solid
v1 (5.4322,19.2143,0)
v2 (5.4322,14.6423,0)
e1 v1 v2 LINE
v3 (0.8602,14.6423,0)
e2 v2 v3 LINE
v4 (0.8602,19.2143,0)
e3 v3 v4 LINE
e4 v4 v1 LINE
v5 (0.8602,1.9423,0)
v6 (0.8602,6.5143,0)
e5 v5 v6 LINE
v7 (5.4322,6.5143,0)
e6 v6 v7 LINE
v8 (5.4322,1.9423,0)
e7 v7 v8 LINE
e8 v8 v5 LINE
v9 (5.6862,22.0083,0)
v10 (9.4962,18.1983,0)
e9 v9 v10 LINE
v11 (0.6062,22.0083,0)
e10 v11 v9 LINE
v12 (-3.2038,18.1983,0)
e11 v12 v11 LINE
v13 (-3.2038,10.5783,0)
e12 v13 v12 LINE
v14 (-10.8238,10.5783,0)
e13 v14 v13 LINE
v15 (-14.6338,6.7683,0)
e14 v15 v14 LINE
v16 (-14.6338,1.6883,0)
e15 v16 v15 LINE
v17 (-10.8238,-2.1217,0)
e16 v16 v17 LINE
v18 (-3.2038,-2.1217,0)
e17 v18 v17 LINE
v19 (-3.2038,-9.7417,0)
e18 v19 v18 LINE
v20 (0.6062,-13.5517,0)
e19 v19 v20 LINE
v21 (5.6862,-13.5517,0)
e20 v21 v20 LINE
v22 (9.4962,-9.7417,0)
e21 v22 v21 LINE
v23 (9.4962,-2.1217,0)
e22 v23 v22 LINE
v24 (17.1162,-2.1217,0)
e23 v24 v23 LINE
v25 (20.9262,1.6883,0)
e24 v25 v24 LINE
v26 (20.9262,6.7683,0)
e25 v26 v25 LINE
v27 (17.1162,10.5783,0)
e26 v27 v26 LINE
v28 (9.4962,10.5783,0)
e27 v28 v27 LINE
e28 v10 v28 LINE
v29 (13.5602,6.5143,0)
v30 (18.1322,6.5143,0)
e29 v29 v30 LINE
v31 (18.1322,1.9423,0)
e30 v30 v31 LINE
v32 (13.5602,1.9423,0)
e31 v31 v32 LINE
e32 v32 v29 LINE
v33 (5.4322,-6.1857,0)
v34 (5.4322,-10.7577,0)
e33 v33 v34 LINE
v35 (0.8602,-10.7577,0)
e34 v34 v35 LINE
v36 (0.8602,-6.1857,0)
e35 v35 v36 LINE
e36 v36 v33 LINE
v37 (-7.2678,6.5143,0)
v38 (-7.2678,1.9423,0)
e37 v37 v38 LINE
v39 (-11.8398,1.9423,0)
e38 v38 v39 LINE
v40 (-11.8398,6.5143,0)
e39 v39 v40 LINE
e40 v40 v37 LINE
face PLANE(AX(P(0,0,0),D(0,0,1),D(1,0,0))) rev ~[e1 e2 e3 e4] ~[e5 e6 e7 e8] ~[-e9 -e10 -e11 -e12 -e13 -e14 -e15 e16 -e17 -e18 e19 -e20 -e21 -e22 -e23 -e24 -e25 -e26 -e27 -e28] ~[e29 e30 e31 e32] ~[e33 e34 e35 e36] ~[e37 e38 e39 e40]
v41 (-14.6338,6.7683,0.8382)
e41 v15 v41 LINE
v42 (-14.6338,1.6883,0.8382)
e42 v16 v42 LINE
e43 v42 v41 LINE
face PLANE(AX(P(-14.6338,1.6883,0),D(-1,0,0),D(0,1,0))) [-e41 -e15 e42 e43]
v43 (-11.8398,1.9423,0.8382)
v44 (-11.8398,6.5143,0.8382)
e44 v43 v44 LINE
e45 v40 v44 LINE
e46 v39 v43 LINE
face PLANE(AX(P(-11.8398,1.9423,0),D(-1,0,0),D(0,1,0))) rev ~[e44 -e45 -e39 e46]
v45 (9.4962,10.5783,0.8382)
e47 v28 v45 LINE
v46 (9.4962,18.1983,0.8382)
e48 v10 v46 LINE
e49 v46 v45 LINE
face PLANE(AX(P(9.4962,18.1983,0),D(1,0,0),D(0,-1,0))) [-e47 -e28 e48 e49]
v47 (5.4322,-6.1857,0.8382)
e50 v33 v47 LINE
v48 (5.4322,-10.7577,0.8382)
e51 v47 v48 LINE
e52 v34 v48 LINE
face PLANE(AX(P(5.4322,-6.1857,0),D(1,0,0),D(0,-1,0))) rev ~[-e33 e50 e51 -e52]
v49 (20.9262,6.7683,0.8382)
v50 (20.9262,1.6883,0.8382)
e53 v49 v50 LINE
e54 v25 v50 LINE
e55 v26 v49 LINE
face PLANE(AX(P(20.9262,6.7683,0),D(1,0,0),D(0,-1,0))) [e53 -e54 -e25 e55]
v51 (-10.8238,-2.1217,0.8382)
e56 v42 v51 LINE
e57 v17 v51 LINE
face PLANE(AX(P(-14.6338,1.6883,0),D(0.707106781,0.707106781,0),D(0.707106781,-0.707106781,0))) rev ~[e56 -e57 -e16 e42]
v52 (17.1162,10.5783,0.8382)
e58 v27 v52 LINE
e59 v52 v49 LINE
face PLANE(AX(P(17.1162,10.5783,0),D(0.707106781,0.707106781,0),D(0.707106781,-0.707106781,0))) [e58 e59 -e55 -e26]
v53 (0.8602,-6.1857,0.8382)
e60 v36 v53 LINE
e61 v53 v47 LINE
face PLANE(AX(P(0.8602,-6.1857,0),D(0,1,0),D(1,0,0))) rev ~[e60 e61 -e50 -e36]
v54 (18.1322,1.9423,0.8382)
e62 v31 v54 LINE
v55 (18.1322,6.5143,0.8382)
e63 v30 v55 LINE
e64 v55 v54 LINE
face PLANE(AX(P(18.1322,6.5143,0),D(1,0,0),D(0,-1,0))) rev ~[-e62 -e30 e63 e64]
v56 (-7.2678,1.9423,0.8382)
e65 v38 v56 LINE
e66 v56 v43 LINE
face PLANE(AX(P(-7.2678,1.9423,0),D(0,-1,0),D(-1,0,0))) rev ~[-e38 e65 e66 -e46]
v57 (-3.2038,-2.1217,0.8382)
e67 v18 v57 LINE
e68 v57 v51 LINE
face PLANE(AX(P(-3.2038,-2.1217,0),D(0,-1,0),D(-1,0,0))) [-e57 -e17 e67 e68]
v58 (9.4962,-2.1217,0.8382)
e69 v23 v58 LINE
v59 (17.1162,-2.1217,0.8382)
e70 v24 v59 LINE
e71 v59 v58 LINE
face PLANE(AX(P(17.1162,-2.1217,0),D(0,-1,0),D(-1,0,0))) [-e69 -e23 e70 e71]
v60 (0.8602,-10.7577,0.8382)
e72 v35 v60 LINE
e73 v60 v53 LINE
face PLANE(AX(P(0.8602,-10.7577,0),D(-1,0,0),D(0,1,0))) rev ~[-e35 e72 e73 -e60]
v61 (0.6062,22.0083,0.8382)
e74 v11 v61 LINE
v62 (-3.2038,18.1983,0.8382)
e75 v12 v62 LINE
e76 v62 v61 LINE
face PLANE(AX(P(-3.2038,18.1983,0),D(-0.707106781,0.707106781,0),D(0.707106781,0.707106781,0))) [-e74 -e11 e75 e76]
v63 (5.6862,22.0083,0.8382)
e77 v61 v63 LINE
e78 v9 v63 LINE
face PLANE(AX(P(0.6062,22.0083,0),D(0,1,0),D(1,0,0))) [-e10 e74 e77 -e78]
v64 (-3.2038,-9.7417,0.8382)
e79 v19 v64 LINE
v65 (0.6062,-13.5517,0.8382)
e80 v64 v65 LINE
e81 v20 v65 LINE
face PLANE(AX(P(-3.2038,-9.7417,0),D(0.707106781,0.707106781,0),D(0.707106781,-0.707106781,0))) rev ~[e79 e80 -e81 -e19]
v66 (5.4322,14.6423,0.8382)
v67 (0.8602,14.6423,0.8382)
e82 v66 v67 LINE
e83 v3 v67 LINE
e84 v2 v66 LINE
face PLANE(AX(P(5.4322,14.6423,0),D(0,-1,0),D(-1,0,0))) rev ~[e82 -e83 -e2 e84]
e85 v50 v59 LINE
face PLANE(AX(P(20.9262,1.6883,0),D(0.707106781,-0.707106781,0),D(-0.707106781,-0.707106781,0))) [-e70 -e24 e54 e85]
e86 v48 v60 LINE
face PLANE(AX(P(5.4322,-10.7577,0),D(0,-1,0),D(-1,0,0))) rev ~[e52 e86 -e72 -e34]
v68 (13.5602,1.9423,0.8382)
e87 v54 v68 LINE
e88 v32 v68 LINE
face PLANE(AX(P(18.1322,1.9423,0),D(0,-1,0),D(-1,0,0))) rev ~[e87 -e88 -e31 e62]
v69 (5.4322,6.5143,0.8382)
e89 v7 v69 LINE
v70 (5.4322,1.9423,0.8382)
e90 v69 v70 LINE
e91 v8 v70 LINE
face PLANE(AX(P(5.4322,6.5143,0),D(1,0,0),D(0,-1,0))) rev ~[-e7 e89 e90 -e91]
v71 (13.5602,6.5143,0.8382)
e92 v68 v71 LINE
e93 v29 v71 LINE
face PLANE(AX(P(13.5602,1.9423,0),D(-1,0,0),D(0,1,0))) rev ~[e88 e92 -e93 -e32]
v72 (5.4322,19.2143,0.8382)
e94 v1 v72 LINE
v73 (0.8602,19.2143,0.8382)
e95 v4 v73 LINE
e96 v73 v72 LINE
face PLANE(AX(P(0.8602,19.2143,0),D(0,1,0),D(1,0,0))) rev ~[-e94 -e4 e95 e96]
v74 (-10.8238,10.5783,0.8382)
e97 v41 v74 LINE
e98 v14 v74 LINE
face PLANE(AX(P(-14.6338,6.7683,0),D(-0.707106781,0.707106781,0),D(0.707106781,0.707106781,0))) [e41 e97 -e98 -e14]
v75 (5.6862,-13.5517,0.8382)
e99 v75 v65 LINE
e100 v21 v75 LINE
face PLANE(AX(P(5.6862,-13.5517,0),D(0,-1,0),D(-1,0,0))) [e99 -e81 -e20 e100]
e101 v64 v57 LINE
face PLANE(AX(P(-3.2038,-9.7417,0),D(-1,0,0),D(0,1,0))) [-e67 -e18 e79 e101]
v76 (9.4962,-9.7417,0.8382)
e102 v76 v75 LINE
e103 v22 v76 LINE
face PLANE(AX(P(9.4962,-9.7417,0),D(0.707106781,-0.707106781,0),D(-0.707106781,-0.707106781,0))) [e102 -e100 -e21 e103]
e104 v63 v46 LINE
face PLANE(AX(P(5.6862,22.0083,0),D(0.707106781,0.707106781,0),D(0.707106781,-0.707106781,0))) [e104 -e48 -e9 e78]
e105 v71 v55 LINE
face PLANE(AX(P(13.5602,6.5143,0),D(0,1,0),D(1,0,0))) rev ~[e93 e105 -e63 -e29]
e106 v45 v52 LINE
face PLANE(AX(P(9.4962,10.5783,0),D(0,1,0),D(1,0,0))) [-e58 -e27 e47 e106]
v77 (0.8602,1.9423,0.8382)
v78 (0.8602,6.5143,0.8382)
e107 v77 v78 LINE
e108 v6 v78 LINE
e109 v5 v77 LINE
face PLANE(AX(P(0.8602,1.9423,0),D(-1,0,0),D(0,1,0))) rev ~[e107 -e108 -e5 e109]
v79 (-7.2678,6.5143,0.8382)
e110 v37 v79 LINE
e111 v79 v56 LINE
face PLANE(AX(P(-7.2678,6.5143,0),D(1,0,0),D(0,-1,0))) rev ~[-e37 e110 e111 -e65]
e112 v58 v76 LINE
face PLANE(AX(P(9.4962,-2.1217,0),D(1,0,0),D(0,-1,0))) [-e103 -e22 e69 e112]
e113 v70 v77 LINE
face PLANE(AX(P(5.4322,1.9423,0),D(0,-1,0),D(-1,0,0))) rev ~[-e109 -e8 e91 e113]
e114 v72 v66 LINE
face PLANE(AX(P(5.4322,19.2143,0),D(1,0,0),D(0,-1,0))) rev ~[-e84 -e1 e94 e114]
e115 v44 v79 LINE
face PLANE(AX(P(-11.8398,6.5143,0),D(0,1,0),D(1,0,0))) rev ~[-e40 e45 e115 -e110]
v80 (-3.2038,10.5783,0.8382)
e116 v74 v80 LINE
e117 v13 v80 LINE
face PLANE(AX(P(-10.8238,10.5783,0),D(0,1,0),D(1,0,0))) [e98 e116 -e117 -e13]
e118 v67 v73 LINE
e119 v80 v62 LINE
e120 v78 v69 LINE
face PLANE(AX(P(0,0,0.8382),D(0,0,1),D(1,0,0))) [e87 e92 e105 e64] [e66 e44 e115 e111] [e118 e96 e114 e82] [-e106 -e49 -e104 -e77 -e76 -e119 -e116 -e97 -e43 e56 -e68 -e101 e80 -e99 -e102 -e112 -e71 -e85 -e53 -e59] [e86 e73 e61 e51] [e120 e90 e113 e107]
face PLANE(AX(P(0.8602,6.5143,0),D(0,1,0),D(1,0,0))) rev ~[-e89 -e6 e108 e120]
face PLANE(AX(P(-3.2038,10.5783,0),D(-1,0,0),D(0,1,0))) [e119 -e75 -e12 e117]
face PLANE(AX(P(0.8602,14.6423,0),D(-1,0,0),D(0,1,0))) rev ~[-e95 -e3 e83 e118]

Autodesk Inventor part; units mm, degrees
ref_plane "YZ Plane" through (0, 0, 0) normal (1, 0, 0) x (0, 1, 0)
ref_plane "XZ Plane" through (0, 0, 0) normal (0, 1, 0) x (-1, 0, 0)
ref_plane "XY Plane" through (0, 0, 0) normal (0, 0, 1) x (1, 0, 0)
sketch "Sketch1" plane through (0, 0, 0) normal (0, 0, 1) x (1, 0, 0)
  line L0 (20.9262, 6.7683) -> (20.9262, 1.6883)
  line L1 (-14.6338, 1.6883) -> (-14.6338, 6.7683)
  line L2 (0.6062, 22.0083) -> (5.6862, 22.0083)
  line L3 (5.6862, -13.5517) -> (0.6062, -13.5517)
  line L4 (-3.2038, -9.7417) -> (-3.2038, -2.1217)
  line L5 (-3.2038, 10.5783) -> (-3.2038, 18.1983)
  line L6 (-10.8238, 10.5783) -> (-3.2038, 10.5783)
  line L7 (9.4962, 10.5783) -> (17.1162, 10.5783)
  line L8 (17.1162, -2.1217) -> (9.4962, -2.1217)
  line L9 (-3.2038, -2.1217) -> (-10.8238, -2.1217)
  line L10 (9.4962, 18.1983) -> (9.4962, 10.5783)
  line L11 (9.4962, -2.1217) -> (9.4962, -9.7417)
  line L12 (-3.2038, 18.1983) -> (0.6062, 22.0083)
  line L13 (5.6862, 22.0083) -> (9.4962, 18.1983)
  line L14 (17.1162, 10.5783) -> (20.9262, 6.7683)
  line L15 (20.9262, 1.6883) -> (17.1162, -2.1217)
  line L16 (9.4962, -9.7417) -> (5.6862, -13.5517)
  line L17 (-3.2038, -9.7417) -> (0.6062, -13.5517)
  line L18 (-14.6338, 1.6883) -> (-10.8238, -2.1217)
  line L19 (-14.6338, 6.7683) -> (-10.8238, 10.5783)
  line L20 (0.8602, 19.2143) -> (5.4322, 19.2143)
  line L21 (5.4322, 19.2143) -> (5.4322, 14.6423)
  line L22 (5.4322, 14.6423) -> (0.8602, 14.6423)
  line L23 (0.8602, 14.6423) -> (0.8602, 19.2143)
  line L24 (-11.8398, 6.5143) -> (-7.2678, 6.5143)
  line L25 (-7.2678, 6.5143) -> (-7.2678, 1.9423)
  line L26 (-7.2678, 1.9423) -> (-11.8398, 1.9423)
  line L27 (-11.8398, 1.9423) -> (-11.8398, 6.5143)
  line L28 (0.8602, -6.1857) -> (5.4322, -6.1857)
  line L29 (5.4322, -6.1857) -> (5.4322, -10.7577)
  line L30 (5.4322, -10.7577) -> (0.8602, -10.7577)
  line L31 (0.8602, -10.7577) -> (0.8602, -6.1857)
  line L32 (13.5602, 6.5143) -> (18.1322, 6.5143)
  line L33 (18.1322, 6.5143) -> (18.1322, 1.9423)
  line L34 (18.1322, 1.9423) -> (13.5602, 1.9423)
  line L35 (13.5602, 1.9423) -> (13.5602, 6.5143)
  line L36 (0.8602, 6.5143) -> (5.4322, 6.5143)
  line L37 (5.4322, 6.5143) -> (5.4322, 1.9423)
  line L38 (5.4322, 1.9423) -> (0.8602, 1.9423)
  line L39 (0.8602, 1.9423) -> (0.8602, 6.5143)
  point P0 (-14.6338, 10.5783)
  point P1 (20.9262, -2.1217)
  point P2 (20.9262, 10.5783)
  point P3 (-14.6338, -2.1217)
  point P4 (-3.2038, 22.0083)
  point P5 (9.4962, -13.5517)
  point P6 (9.4962, 22.0083)
  point P7 (-3.2038, -13.5517)
  dimension "d0" = 35.56
  dimension "d1" = 35.56
  dimension "d2" = 12.7
  dimension "d3" = 12.7
  dimension "d4" = 12.7
  dimension "d5" = 12.7
  dimension "d6" = 11.43
  dimension "d7" = 11.43
  dimension "d8" = 11.43
  dimension "d9" = 11.43
  dimension "d10" = 3.81
  dimension "d11" = 3.81
  dimension "d12" = 3.81
  dimension "d13" = 3.81
  dimension "d14" = 3.81
  dimension "d15" = 3.81
  dimension "d16" = 3.81
  dimension "d17" = 3.81
  dimension "d18" = 3.81
  dimension "d19" = 3.81
  dimension "d20" = 3.81
  dimension "d21" = 3.81
  dimension "d22" = 3.81
  dimension "d23" = 3.81
  dimension "d24" = 3.81
  dimension "d25" = 3.81
  dimension "d26" = 4.572
  dimension "d27" = 4.572
  dimension "d28" = 4.572
  dimension "d29" = 4.572
  dimension "d30" = 4.572
  dimension "d31" = 4.572
  dimension "d32" = 4.572
  dimension "d33" = 4.572
  dimension "d34" = 4.572
  dimension "d35" = 4.572
  dimension "d36" = 2.794
  dimension "d37" = 2.794
  dimension "d38" = 2.794
  dimension "d39" = 2.794
  dimension "d40" = 4.064
  dimension "d41" = 4.064
  dimension "d42" = 11.43
extrude "Extrusion1" add sketch "Sketch1" along normal blind 0.8382
sketch "Sketch2" plane through (0, 0, 0.8382) normal (0, 0, 1) x (1, 0, 0)
  line L0 (5.4322, 19.2143) -> (5.4322, 14.6423) projected
  line L1 (5.4322, 14.6423) -> (0.8602, 14.6423) projected
  line L2 (0.8602, 14.6423) -> (0.8602, 19.2143) projected
  line L3 (0.8602, 19.2143) -> (5.4322, 19.2143) projected
  circle A0 centre (3.1462, 16.9283) radius 2.286
  point P0 (0, 0)
surface extrude "ExtrusionSrf1" sketch "Sketch2" against normal up to surface (0.8382 mm away) shown no curves A0
pattern_linear "Rectangular Pattern1" count 3 spacing 12.7 along (0, -1, 0) of "ExtrusionSrf1"
sketch "Sketch3" plane through (0, 0, 0.8382) normal (0, 0, 1) x (1, 0, 0)
  line L0 (-7.2678, 6.5143) -> (-7.2678, 1.9423) projected
  line L1 (-7.2678, 1.9423) -> (-11.8398, 1.9423) projected
  line L2 (-11.8398, 1.9423) -> (-11.8398, 6.5143) projected
  line L3 (-11.8398, 6.5143) -> (-7.2678, 6.5143) projected
  circle A0 centre (-9.5538, 4.2283) radius 2.286
  point P0 (0, 0)
surface extrude "ExtrusionSrf4" sketch "Sketch3" against normal up to surface (0.8382 mm away) shown no curves A0
pattern_linear "Rectangular Pattern2" count 2 spacing 25.4 along (1, 0, 0) of "ExtrusionSrf4"
equation "\"d11\" = d10"
equation "\"d12\" = d10"
equation "\"d13\" = d12"
equation "\"d14\" = d10"
equation "\"d15\" = d14"
equation "\"d16\" = d10"
equation "\"d17\" = d16"
equation "\"d18\" = d10"
equation "\"d19\" = d18"
equation "\"d20\" = d10"
equation "\"d21\" = d20"
equation "\"d22\" = d10"
equation "\"d23\" = d22"
equation "\"d24\" = d10"
equation "\"d25\" = d24"
properties part number "276-1110" material "Steel"
